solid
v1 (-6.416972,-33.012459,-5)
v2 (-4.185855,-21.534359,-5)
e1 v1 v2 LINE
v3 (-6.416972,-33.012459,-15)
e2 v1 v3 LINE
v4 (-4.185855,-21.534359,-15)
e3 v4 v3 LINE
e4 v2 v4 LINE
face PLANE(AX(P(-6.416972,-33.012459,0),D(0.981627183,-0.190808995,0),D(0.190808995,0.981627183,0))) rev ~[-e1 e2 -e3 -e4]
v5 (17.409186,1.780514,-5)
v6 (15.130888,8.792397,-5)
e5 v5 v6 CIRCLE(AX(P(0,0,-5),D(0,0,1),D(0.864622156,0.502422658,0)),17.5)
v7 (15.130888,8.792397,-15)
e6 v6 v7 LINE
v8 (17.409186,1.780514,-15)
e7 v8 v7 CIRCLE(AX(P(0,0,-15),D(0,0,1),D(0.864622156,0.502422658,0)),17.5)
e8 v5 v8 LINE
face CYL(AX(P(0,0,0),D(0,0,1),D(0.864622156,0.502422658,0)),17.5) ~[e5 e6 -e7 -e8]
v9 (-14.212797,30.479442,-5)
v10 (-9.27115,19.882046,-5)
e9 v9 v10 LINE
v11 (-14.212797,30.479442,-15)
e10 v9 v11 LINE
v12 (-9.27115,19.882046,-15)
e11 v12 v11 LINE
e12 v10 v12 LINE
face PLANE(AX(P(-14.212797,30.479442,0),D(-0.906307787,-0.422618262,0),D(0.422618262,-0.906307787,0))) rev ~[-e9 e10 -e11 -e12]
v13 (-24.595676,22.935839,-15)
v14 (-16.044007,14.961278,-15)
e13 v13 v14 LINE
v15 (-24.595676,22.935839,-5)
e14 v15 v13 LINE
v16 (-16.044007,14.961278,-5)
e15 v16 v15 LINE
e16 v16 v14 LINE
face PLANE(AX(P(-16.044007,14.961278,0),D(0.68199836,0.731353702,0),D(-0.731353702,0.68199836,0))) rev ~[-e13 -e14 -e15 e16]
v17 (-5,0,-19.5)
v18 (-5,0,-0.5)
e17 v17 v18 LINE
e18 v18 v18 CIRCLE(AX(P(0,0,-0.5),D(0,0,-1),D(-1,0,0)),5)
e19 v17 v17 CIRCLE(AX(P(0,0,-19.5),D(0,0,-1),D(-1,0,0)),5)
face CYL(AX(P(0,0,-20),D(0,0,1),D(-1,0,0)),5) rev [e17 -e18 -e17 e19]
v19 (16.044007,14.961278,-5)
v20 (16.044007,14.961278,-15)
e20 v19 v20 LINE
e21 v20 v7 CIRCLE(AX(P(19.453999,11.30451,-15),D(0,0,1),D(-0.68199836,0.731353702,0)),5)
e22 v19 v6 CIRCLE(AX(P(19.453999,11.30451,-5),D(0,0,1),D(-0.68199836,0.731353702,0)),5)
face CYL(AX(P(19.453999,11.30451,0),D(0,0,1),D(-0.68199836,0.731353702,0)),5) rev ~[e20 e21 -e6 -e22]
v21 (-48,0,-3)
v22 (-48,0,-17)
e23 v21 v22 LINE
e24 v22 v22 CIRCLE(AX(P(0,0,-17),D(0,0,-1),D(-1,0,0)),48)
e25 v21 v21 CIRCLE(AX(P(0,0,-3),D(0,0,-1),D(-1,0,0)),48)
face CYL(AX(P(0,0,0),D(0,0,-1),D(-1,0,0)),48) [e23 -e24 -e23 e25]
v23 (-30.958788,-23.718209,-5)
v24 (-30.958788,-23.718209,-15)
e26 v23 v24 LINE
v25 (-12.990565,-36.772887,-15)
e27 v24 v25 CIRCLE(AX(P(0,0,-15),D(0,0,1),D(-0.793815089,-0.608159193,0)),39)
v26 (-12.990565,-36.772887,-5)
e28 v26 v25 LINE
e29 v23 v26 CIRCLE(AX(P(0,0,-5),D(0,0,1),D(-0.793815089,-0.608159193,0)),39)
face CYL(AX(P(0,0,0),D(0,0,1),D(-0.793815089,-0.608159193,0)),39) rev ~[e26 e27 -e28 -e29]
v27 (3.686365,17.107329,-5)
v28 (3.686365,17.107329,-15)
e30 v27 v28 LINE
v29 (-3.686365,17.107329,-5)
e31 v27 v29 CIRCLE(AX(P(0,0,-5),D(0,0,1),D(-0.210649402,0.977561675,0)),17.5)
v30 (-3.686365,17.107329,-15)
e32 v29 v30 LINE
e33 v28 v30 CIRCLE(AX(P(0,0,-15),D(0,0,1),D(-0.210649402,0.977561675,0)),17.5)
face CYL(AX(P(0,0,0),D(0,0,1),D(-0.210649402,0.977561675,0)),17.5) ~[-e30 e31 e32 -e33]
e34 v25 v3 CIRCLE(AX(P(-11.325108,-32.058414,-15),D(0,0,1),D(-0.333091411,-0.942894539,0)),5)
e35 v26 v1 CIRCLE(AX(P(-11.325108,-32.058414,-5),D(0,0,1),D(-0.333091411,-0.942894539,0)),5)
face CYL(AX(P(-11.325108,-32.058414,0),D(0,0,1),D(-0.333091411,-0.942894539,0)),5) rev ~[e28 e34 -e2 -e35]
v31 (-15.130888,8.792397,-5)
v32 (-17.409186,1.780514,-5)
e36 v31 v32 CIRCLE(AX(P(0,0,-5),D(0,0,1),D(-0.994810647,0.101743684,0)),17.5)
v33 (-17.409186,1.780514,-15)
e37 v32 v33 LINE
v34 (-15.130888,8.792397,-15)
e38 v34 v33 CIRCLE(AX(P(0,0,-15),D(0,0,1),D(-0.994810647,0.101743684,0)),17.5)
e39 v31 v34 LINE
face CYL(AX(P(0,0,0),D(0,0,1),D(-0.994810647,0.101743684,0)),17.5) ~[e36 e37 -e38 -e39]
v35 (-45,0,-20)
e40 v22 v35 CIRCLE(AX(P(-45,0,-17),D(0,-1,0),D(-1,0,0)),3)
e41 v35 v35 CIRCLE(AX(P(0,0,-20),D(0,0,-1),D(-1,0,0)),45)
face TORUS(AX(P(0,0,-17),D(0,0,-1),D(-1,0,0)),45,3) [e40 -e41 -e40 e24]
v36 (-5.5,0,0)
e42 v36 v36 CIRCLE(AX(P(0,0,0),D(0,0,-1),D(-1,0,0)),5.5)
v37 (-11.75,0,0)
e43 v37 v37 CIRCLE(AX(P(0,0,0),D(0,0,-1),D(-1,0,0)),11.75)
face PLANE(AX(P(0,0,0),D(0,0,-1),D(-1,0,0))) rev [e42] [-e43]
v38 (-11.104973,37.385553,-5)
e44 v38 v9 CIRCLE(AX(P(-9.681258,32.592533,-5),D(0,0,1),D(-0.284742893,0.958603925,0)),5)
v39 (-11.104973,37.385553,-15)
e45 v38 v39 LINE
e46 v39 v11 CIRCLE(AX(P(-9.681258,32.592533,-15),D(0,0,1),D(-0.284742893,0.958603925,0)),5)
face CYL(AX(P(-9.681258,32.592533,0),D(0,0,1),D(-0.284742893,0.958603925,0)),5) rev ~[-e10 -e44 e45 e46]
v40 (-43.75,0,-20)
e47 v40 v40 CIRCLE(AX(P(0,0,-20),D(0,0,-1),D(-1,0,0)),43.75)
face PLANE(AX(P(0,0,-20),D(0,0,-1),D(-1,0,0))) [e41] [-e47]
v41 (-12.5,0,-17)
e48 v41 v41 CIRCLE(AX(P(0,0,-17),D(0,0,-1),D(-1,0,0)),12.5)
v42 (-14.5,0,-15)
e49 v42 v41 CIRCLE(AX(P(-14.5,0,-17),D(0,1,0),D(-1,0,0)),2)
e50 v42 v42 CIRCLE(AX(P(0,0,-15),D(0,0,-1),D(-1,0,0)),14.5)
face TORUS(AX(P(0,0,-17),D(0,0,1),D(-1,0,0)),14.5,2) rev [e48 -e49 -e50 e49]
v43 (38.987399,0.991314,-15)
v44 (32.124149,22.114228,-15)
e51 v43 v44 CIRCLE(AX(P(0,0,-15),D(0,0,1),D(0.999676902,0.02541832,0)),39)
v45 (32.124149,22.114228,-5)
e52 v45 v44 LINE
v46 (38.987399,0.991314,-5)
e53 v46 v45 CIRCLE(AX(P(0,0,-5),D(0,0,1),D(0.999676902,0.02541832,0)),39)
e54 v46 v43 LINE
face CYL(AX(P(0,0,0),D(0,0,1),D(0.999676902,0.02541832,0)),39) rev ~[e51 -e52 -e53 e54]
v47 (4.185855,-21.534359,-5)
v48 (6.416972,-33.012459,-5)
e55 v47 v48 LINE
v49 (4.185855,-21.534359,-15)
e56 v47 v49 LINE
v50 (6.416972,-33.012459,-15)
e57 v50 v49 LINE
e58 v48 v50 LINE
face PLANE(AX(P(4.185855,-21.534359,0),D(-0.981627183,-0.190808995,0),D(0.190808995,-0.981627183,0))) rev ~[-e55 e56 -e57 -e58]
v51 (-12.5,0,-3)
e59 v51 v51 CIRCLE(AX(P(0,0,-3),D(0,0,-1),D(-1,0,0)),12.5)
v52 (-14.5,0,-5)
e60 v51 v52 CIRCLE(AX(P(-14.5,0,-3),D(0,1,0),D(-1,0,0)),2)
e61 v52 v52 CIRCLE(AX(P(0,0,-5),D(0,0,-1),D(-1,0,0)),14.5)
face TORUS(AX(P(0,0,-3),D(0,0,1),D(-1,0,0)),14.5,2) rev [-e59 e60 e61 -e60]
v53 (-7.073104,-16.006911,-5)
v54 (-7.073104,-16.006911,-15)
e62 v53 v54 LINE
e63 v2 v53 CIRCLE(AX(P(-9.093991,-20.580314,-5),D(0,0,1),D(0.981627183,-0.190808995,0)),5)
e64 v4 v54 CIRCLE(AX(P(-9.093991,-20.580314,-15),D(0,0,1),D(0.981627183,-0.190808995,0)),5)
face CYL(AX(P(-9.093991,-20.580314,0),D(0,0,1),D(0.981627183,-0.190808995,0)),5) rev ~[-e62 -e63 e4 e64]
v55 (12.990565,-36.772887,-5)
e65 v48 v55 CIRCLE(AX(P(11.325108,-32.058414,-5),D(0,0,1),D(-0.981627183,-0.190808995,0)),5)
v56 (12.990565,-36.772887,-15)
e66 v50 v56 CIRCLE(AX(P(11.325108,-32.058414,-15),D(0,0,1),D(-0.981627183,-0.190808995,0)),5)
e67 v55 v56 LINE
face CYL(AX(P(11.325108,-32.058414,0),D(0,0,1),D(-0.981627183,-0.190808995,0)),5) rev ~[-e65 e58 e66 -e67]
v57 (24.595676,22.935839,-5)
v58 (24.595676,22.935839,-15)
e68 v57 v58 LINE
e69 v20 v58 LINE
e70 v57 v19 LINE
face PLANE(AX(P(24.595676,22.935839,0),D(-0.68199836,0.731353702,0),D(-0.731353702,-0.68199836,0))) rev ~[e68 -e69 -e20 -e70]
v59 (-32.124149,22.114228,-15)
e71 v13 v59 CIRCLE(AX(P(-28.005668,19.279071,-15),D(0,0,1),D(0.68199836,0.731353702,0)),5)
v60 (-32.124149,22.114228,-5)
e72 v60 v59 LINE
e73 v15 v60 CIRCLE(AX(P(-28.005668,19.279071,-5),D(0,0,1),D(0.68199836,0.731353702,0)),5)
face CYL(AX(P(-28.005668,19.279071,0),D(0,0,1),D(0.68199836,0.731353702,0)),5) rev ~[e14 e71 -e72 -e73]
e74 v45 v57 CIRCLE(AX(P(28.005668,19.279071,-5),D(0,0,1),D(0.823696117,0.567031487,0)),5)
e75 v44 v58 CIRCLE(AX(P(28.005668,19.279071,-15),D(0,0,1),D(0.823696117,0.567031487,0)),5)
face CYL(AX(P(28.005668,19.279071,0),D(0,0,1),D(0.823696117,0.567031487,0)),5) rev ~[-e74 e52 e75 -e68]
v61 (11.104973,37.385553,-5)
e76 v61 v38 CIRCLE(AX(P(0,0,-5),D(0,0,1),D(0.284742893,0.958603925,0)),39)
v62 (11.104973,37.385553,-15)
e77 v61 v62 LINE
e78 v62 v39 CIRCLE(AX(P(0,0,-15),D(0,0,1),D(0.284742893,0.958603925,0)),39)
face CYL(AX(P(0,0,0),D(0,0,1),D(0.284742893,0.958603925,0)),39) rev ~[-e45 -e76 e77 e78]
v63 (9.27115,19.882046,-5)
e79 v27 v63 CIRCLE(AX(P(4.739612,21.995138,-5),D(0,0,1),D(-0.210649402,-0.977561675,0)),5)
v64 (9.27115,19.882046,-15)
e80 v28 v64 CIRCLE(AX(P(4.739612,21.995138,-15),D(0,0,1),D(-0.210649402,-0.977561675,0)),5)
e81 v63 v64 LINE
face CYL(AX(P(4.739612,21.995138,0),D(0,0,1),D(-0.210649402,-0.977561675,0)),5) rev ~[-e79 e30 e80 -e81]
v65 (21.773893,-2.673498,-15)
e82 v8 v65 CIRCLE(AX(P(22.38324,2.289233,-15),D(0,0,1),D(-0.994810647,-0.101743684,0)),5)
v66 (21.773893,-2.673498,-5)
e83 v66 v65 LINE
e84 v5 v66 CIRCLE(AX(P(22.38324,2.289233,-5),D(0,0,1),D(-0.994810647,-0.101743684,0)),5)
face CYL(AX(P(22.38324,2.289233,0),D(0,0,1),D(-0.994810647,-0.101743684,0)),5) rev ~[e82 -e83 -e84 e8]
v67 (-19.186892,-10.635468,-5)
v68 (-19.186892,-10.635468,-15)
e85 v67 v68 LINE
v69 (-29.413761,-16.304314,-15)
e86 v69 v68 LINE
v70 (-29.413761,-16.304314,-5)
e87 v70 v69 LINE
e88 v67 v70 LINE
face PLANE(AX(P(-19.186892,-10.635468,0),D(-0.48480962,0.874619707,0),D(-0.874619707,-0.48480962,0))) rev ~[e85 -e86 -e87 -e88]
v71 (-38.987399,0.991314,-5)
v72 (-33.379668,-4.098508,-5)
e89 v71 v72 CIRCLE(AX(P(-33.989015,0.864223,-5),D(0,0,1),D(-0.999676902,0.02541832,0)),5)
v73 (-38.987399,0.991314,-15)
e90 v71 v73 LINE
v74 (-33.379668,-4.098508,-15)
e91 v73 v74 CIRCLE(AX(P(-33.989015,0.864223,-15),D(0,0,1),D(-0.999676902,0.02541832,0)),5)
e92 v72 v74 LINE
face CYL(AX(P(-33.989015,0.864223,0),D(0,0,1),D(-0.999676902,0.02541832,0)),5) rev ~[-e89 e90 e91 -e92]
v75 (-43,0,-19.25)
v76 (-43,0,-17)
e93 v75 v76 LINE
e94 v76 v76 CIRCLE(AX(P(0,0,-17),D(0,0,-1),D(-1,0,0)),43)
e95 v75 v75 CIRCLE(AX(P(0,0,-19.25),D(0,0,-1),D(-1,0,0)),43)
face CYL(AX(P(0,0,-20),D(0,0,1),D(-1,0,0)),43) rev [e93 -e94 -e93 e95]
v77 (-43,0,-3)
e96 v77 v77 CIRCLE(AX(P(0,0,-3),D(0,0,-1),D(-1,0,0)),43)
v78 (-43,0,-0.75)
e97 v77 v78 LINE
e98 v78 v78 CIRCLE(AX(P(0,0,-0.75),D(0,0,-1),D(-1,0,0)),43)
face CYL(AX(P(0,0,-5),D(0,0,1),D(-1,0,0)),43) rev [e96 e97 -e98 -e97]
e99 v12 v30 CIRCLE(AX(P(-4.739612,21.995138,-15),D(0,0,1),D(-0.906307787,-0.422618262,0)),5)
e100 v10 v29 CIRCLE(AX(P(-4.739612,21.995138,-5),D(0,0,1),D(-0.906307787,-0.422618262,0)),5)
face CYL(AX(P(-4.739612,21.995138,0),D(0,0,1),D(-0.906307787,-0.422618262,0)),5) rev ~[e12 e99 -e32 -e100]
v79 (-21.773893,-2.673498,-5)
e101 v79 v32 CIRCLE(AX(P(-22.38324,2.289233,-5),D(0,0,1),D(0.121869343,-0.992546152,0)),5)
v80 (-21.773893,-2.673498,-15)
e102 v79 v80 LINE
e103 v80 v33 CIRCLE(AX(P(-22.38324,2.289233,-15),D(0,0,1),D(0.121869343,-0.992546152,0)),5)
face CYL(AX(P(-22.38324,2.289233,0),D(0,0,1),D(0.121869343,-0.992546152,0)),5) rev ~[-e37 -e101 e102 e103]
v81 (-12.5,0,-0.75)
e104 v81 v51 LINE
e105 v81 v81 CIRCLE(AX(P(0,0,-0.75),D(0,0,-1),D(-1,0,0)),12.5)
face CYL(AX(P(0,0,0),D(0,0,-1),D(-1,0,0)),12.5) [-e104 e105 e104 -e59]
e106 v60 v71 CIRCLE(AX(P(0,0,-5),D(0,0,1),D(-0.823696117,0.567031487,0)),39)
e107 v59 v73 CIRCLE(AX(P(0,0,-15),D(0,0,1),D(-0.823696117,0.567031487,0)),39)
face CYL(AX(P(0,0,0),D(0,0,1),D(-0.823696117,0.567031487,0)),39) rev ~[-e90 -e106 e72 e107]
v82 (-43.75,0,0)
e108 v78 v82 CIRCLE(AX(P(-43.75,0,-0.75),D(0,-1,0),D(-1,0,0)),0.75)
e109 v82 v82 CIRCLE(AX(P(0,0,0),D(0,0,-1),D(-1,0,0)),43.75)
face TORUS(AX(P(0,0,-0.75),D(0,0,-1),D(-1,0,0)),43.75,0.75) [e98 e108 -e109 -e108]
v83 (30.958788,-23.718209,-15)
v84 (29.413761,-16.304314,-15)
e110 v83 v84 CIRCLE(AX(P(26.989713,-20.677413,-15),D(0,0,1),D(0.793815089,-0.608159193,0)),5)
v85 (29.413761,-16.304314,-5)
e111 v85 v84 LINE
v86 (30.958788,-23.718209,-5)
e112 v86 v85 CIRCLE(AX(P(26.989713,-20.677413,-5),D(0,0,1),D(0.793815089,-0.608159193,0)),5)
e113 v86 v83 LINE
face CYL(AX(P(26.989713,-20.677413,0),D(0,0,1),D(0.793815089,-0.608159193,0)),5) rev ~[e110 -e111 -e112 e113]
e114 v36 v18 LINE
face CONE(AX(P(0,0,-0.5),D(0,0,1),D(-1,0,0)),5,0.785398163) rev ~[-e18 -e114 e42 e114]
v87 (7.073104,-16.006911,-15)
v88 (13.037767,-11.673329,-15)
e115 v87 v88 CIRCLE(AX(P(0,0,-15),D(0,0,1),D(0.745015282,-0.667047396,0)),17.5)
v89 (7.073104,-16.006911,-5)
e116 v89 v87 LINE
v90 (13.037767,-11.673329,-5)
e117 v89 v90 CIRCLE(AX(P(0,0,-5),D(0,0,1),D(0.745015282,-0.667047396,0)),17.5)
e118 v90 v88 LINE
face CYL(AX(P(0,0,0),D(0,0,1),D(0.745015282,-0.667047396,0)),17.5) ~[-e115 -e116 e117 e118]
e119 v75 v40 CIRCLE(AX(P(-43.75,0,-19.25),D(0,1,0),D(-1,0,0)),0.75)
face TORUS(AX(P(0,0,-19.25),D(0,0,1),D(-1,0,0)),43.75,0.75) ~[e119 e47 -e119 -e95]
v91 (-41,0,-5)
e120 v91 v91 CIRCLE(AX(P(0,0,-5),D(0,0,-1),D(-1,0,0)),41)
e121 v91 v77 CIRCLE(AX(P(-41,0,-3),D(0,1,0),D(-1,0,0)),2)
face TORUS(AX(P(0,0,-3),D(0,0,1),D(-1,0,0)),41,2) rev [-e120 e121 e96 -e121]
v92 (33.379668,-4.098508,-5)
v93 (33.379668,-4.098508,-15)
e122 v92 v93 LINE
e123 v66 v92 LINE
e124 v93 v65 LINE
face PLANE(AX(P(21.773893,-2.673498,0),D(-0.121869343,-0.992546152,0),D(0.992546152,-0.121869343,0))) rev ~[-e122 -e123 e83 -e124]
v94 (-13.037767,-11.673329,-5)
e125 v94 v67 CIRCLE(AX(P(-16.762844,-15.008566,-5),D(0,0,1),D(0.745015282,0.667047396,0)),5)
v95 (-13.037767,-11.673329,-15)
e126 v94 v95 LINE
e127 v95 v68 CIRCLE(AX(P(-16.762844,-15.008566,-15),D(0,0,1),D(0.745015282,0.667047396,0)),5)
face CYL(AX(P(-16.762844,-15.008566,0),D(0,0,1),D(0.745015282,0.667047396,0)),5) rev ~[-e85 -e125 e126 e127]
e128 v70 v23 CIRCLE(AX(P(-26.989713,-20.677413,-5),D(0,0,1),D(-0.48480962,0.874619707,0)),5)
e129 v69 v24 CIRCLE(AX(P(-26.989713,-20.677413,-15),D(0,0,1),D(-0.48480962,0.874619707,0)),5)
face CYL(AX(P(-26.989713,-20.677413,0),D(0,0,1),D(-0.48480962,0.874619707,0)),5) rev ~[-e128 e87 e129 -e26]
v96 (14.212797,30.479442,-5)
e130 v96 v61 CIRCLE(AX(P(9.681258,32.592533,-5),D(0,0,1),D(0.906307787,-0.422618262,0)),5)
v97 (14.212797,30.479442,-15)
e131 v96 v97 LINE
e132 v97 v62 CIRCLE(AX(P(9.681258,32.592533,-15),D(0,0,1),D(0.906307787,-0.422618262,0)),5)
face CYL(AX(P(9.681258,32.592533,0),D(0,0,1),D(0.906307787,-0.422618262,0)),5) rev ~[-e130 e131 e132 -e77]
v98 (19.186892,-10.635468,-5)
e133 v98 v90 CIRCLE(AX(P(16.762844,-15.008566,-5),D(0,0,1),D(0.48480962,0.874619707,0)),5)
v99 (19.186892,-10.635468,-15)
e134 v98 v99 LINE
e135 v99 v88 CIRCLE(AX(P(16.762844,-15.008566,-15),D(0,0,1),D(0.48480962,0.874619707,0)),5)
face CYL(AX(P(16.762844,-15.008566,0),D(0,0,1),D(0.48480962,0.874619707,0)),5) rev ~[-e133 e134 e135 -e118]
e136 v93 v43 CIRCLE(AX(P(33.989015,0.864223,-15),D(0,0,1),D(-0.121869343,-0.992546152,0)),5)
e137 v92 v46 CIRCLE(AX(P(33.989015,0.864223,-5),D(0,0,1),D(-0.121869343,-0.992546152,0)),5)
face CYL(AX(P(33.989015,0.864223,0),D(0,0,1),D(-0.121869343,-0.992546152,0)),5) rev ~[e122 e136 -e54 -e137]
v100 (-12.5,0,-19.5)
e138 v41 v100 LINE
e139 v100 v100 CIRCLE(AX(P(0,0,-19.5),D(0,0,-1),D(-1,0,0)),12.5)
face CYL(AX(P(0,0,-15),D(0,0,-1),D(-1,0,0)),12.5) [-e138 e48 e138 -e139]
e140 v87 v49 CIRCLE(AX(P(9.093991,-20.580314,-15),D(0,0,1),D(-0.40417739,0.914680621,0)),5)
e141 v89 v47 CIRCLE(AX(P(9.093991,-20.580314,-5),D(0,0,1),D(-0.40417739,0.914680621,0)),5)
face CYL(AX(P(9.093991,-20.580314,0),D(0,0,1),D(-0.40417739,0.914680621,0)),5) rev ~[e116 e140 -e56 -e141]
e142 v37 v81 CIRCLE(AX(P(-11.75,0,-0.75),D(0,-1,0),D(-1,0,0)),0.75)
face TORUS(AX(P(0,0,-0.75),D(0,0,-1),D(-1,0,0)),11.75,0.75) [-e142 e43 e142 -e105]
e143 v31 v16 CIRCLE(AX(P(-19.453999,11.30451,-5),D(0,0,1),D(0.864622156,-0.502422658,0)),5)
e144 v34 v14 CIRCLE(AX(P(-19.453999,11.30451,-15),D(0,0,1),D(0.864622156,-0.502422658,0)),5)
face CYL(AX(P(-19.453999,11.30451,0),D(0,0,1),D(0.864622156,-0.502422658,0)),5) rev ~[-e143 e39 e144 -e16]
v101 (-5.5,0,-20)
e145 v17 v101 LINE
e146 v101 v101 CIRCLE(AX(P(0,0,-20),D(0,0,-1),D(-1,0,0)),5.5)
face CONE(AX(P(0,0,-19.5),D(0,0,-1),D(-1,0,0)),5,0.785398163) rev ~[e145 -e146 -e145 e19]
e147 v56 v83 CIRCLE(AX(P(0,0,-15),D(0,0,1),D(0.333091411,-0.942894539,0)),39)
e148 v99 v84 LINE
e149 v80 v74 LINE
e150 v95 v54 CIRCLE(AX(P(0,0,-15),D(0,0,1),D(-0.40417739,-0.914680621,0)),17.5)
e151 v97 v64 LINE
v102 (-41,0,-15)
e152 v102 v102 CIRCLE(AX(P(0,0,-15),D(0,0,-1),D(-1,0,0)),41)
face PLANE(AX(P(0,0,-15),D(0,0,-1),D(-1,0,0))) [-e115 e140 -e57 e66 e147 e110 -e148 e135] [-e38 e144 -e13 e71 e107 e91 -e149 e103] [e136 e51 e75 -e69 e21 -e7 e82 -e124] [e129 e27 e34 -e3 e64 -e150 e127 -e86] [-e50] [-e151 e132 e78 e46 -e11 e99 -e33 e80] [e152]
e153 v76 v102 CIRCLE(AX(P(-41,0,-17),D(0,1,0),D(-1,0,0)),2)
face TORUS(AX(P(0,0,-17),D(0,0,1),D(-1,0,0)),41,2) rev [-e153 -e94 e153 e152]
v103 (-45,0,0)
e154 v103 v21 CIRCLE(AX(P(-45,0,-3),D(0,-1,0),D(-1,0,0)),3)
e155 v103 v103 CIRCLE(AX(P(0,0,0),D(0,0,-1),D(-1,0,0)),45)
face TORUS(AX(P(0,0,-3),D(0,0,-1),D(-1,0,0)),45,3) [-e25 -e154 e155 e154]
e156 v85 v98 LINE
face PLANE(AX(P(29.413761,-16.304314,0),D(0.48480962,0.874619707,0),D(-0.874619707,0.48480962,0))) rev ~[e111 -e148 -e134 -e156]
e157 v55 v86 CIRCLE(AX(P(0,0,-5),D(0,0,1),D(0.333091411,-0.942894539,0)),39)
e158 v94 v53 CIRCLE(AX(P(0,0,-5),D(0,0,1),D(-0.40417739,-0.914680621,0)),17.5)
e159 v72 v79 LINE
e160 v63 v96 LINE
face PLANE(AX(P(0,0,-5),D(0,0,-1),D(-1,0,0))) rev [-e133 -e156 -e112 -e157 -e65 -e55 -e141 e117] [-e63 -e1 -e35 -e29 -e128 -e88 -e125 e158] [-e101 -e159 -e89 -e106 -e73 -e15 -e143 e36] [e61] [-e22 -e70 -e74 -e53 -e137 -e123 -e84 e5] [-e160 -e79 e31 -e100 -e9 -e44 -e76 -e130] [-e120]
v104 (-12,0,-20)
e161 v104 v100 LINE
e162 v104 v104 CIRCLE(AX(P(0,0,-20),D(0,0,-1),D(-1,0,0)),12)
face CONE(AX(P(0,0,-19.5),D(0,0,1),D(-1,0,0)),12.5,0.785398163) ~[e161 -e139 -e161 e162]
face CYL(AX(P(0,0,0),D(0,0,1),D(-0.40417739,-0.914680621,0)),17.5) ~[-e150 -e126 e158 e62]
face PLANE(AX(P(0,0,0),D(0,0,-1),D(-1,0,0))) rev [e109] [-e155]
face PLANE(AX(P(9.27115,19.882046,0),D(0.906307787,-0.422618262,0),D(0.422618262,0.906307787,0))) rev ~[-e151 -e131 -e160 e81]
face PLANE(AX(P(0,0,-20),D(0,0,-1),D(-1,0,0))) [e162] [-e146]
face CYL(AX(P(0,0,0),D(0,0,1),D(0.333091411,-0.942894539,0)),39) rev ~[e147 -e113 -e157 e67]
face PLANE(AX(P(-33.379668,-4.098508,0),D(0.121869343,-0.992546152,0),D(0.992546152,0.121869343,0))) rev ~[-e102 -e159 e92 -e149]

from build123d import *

# Parameters (mm, degrees)
F2_R            = 2
F3_R            = 3
F4_SIZE         = 0.5
F5_R            = 0.75
F8_DEPTH        = 20.001
F8_COPIES_COUNT = 5


# Not quite as in the source:
# - a pattern or mirror of a feature is missing from the dataset's text; its kind, count and spacing are read off the source's solid
# - a feature names something its author has since deleted; it is built from what else it names


with BuildPart() as f1:
    # F0 (on Front) → F1 (revolve)
    with BuildSketch(Plane.XZ):
        Polygon((-5, -20), (-5, 0), (-12.5, 0), (-12.5, -5), (-43, -5), (-43, 0), (-48, 0), (-48, -20), (-43, -20), (-43, -15), (-12.5, -15), (-12.5, -20), align=None)
    revolve(axis=Axis((0, 0, -8.972), (0, 0, -1)))

    # F2
    f2_edges = [f1.edges().sort_by_distance(p)[0] for p in [
        (12.5, 0, -5),
        (43, 0, -5),
        (12.5, 0, -15),
        (43, 0, -15),
    ]]
    fillet(f2_edges, radius=F2_R)

    # F3
    f3_edges = [f1.edges().sort_by_distance(p)[0] for p in [
        (48, 0, 0),
        (48, 0, -20),
    ]]
    fillet(f3_edges, radius=F3_R)

    # F4
    f4_edges = [f1.edges().sort_by_distance(p)[0] for p in [
        (12.5, 0, -20),
        (5, 0, -20),
        (5, 0, 0),
        (-5, 0, -10),
    ]]
    chamfer(f4_edges, length=F4_SIZE)

    # F5
    f5_edges = [f1.edges().sort_by_distance(p)[0] for p in [
        (-43, 0, -18.5),
        (43, 0, -17),
        (43, 0, -20),
        (-43, 0, -1.5),
        (43, 0, -3),
        (43, 0, 0),
        (12.5, 0, 0),
    ]]
    fillet(f5_edges, radius=F5_R)

    # F6 (on Top) → F8 (cut, through all)
    with BuildSketch(Plane.XY):
        with BuildLine():
            ThreePointArc((-11.1049728154, 37.3855530756), (-14.2408474581, 34.6443977691), (-14.212797287, 30.4794421418))
            Line((-14.212797287, 30.4794421418), (-9.2711504906, 19.8820463882))
            ThreePointArc((-9.2711504906, 19.8820463882), (-6.9643345444, 17.5173472124), (-3.6863645431, 17.1073293198))
            ThreePointArc((-3.6863645431, 17.1073293198), (0, 17.5), (3.6863645431, 17.1073293198))
            ThreePointArc((3.6863645431, 17.1073293198), (6.9643345444, 17.5173472124), (9.2711504906, 19.8820463882))
            Line((9.2711504906, 19.8820463882), (14.212797287, 30.4794421418))
            ThreePointArc((14.212797287, 30.4794421418), (14.2408474581, 34.6443977691), (11.1049728154, 37.3855530756))
            ThreePointArc((11.1049728154, 37.3855530756), (0, 39), (-11.1049728154, 37.3855530756))
        make_face()
    f8 = extrude(amount=-F8_DEPTH, mode=Mode.SUBTRACT)

    # F8_copies: F8 ×5 about axis
    f8_copies_axis = Axis((0, 0, 0), (0, 0, 1))
    for i in range(1, F8_COPIES_COUNT):
        add(f8.rotate(f8_copies_axis, i * 360 / F8_COPIES_COUNT), mode=Mode.SUBTRACT)


solid = f1.part
